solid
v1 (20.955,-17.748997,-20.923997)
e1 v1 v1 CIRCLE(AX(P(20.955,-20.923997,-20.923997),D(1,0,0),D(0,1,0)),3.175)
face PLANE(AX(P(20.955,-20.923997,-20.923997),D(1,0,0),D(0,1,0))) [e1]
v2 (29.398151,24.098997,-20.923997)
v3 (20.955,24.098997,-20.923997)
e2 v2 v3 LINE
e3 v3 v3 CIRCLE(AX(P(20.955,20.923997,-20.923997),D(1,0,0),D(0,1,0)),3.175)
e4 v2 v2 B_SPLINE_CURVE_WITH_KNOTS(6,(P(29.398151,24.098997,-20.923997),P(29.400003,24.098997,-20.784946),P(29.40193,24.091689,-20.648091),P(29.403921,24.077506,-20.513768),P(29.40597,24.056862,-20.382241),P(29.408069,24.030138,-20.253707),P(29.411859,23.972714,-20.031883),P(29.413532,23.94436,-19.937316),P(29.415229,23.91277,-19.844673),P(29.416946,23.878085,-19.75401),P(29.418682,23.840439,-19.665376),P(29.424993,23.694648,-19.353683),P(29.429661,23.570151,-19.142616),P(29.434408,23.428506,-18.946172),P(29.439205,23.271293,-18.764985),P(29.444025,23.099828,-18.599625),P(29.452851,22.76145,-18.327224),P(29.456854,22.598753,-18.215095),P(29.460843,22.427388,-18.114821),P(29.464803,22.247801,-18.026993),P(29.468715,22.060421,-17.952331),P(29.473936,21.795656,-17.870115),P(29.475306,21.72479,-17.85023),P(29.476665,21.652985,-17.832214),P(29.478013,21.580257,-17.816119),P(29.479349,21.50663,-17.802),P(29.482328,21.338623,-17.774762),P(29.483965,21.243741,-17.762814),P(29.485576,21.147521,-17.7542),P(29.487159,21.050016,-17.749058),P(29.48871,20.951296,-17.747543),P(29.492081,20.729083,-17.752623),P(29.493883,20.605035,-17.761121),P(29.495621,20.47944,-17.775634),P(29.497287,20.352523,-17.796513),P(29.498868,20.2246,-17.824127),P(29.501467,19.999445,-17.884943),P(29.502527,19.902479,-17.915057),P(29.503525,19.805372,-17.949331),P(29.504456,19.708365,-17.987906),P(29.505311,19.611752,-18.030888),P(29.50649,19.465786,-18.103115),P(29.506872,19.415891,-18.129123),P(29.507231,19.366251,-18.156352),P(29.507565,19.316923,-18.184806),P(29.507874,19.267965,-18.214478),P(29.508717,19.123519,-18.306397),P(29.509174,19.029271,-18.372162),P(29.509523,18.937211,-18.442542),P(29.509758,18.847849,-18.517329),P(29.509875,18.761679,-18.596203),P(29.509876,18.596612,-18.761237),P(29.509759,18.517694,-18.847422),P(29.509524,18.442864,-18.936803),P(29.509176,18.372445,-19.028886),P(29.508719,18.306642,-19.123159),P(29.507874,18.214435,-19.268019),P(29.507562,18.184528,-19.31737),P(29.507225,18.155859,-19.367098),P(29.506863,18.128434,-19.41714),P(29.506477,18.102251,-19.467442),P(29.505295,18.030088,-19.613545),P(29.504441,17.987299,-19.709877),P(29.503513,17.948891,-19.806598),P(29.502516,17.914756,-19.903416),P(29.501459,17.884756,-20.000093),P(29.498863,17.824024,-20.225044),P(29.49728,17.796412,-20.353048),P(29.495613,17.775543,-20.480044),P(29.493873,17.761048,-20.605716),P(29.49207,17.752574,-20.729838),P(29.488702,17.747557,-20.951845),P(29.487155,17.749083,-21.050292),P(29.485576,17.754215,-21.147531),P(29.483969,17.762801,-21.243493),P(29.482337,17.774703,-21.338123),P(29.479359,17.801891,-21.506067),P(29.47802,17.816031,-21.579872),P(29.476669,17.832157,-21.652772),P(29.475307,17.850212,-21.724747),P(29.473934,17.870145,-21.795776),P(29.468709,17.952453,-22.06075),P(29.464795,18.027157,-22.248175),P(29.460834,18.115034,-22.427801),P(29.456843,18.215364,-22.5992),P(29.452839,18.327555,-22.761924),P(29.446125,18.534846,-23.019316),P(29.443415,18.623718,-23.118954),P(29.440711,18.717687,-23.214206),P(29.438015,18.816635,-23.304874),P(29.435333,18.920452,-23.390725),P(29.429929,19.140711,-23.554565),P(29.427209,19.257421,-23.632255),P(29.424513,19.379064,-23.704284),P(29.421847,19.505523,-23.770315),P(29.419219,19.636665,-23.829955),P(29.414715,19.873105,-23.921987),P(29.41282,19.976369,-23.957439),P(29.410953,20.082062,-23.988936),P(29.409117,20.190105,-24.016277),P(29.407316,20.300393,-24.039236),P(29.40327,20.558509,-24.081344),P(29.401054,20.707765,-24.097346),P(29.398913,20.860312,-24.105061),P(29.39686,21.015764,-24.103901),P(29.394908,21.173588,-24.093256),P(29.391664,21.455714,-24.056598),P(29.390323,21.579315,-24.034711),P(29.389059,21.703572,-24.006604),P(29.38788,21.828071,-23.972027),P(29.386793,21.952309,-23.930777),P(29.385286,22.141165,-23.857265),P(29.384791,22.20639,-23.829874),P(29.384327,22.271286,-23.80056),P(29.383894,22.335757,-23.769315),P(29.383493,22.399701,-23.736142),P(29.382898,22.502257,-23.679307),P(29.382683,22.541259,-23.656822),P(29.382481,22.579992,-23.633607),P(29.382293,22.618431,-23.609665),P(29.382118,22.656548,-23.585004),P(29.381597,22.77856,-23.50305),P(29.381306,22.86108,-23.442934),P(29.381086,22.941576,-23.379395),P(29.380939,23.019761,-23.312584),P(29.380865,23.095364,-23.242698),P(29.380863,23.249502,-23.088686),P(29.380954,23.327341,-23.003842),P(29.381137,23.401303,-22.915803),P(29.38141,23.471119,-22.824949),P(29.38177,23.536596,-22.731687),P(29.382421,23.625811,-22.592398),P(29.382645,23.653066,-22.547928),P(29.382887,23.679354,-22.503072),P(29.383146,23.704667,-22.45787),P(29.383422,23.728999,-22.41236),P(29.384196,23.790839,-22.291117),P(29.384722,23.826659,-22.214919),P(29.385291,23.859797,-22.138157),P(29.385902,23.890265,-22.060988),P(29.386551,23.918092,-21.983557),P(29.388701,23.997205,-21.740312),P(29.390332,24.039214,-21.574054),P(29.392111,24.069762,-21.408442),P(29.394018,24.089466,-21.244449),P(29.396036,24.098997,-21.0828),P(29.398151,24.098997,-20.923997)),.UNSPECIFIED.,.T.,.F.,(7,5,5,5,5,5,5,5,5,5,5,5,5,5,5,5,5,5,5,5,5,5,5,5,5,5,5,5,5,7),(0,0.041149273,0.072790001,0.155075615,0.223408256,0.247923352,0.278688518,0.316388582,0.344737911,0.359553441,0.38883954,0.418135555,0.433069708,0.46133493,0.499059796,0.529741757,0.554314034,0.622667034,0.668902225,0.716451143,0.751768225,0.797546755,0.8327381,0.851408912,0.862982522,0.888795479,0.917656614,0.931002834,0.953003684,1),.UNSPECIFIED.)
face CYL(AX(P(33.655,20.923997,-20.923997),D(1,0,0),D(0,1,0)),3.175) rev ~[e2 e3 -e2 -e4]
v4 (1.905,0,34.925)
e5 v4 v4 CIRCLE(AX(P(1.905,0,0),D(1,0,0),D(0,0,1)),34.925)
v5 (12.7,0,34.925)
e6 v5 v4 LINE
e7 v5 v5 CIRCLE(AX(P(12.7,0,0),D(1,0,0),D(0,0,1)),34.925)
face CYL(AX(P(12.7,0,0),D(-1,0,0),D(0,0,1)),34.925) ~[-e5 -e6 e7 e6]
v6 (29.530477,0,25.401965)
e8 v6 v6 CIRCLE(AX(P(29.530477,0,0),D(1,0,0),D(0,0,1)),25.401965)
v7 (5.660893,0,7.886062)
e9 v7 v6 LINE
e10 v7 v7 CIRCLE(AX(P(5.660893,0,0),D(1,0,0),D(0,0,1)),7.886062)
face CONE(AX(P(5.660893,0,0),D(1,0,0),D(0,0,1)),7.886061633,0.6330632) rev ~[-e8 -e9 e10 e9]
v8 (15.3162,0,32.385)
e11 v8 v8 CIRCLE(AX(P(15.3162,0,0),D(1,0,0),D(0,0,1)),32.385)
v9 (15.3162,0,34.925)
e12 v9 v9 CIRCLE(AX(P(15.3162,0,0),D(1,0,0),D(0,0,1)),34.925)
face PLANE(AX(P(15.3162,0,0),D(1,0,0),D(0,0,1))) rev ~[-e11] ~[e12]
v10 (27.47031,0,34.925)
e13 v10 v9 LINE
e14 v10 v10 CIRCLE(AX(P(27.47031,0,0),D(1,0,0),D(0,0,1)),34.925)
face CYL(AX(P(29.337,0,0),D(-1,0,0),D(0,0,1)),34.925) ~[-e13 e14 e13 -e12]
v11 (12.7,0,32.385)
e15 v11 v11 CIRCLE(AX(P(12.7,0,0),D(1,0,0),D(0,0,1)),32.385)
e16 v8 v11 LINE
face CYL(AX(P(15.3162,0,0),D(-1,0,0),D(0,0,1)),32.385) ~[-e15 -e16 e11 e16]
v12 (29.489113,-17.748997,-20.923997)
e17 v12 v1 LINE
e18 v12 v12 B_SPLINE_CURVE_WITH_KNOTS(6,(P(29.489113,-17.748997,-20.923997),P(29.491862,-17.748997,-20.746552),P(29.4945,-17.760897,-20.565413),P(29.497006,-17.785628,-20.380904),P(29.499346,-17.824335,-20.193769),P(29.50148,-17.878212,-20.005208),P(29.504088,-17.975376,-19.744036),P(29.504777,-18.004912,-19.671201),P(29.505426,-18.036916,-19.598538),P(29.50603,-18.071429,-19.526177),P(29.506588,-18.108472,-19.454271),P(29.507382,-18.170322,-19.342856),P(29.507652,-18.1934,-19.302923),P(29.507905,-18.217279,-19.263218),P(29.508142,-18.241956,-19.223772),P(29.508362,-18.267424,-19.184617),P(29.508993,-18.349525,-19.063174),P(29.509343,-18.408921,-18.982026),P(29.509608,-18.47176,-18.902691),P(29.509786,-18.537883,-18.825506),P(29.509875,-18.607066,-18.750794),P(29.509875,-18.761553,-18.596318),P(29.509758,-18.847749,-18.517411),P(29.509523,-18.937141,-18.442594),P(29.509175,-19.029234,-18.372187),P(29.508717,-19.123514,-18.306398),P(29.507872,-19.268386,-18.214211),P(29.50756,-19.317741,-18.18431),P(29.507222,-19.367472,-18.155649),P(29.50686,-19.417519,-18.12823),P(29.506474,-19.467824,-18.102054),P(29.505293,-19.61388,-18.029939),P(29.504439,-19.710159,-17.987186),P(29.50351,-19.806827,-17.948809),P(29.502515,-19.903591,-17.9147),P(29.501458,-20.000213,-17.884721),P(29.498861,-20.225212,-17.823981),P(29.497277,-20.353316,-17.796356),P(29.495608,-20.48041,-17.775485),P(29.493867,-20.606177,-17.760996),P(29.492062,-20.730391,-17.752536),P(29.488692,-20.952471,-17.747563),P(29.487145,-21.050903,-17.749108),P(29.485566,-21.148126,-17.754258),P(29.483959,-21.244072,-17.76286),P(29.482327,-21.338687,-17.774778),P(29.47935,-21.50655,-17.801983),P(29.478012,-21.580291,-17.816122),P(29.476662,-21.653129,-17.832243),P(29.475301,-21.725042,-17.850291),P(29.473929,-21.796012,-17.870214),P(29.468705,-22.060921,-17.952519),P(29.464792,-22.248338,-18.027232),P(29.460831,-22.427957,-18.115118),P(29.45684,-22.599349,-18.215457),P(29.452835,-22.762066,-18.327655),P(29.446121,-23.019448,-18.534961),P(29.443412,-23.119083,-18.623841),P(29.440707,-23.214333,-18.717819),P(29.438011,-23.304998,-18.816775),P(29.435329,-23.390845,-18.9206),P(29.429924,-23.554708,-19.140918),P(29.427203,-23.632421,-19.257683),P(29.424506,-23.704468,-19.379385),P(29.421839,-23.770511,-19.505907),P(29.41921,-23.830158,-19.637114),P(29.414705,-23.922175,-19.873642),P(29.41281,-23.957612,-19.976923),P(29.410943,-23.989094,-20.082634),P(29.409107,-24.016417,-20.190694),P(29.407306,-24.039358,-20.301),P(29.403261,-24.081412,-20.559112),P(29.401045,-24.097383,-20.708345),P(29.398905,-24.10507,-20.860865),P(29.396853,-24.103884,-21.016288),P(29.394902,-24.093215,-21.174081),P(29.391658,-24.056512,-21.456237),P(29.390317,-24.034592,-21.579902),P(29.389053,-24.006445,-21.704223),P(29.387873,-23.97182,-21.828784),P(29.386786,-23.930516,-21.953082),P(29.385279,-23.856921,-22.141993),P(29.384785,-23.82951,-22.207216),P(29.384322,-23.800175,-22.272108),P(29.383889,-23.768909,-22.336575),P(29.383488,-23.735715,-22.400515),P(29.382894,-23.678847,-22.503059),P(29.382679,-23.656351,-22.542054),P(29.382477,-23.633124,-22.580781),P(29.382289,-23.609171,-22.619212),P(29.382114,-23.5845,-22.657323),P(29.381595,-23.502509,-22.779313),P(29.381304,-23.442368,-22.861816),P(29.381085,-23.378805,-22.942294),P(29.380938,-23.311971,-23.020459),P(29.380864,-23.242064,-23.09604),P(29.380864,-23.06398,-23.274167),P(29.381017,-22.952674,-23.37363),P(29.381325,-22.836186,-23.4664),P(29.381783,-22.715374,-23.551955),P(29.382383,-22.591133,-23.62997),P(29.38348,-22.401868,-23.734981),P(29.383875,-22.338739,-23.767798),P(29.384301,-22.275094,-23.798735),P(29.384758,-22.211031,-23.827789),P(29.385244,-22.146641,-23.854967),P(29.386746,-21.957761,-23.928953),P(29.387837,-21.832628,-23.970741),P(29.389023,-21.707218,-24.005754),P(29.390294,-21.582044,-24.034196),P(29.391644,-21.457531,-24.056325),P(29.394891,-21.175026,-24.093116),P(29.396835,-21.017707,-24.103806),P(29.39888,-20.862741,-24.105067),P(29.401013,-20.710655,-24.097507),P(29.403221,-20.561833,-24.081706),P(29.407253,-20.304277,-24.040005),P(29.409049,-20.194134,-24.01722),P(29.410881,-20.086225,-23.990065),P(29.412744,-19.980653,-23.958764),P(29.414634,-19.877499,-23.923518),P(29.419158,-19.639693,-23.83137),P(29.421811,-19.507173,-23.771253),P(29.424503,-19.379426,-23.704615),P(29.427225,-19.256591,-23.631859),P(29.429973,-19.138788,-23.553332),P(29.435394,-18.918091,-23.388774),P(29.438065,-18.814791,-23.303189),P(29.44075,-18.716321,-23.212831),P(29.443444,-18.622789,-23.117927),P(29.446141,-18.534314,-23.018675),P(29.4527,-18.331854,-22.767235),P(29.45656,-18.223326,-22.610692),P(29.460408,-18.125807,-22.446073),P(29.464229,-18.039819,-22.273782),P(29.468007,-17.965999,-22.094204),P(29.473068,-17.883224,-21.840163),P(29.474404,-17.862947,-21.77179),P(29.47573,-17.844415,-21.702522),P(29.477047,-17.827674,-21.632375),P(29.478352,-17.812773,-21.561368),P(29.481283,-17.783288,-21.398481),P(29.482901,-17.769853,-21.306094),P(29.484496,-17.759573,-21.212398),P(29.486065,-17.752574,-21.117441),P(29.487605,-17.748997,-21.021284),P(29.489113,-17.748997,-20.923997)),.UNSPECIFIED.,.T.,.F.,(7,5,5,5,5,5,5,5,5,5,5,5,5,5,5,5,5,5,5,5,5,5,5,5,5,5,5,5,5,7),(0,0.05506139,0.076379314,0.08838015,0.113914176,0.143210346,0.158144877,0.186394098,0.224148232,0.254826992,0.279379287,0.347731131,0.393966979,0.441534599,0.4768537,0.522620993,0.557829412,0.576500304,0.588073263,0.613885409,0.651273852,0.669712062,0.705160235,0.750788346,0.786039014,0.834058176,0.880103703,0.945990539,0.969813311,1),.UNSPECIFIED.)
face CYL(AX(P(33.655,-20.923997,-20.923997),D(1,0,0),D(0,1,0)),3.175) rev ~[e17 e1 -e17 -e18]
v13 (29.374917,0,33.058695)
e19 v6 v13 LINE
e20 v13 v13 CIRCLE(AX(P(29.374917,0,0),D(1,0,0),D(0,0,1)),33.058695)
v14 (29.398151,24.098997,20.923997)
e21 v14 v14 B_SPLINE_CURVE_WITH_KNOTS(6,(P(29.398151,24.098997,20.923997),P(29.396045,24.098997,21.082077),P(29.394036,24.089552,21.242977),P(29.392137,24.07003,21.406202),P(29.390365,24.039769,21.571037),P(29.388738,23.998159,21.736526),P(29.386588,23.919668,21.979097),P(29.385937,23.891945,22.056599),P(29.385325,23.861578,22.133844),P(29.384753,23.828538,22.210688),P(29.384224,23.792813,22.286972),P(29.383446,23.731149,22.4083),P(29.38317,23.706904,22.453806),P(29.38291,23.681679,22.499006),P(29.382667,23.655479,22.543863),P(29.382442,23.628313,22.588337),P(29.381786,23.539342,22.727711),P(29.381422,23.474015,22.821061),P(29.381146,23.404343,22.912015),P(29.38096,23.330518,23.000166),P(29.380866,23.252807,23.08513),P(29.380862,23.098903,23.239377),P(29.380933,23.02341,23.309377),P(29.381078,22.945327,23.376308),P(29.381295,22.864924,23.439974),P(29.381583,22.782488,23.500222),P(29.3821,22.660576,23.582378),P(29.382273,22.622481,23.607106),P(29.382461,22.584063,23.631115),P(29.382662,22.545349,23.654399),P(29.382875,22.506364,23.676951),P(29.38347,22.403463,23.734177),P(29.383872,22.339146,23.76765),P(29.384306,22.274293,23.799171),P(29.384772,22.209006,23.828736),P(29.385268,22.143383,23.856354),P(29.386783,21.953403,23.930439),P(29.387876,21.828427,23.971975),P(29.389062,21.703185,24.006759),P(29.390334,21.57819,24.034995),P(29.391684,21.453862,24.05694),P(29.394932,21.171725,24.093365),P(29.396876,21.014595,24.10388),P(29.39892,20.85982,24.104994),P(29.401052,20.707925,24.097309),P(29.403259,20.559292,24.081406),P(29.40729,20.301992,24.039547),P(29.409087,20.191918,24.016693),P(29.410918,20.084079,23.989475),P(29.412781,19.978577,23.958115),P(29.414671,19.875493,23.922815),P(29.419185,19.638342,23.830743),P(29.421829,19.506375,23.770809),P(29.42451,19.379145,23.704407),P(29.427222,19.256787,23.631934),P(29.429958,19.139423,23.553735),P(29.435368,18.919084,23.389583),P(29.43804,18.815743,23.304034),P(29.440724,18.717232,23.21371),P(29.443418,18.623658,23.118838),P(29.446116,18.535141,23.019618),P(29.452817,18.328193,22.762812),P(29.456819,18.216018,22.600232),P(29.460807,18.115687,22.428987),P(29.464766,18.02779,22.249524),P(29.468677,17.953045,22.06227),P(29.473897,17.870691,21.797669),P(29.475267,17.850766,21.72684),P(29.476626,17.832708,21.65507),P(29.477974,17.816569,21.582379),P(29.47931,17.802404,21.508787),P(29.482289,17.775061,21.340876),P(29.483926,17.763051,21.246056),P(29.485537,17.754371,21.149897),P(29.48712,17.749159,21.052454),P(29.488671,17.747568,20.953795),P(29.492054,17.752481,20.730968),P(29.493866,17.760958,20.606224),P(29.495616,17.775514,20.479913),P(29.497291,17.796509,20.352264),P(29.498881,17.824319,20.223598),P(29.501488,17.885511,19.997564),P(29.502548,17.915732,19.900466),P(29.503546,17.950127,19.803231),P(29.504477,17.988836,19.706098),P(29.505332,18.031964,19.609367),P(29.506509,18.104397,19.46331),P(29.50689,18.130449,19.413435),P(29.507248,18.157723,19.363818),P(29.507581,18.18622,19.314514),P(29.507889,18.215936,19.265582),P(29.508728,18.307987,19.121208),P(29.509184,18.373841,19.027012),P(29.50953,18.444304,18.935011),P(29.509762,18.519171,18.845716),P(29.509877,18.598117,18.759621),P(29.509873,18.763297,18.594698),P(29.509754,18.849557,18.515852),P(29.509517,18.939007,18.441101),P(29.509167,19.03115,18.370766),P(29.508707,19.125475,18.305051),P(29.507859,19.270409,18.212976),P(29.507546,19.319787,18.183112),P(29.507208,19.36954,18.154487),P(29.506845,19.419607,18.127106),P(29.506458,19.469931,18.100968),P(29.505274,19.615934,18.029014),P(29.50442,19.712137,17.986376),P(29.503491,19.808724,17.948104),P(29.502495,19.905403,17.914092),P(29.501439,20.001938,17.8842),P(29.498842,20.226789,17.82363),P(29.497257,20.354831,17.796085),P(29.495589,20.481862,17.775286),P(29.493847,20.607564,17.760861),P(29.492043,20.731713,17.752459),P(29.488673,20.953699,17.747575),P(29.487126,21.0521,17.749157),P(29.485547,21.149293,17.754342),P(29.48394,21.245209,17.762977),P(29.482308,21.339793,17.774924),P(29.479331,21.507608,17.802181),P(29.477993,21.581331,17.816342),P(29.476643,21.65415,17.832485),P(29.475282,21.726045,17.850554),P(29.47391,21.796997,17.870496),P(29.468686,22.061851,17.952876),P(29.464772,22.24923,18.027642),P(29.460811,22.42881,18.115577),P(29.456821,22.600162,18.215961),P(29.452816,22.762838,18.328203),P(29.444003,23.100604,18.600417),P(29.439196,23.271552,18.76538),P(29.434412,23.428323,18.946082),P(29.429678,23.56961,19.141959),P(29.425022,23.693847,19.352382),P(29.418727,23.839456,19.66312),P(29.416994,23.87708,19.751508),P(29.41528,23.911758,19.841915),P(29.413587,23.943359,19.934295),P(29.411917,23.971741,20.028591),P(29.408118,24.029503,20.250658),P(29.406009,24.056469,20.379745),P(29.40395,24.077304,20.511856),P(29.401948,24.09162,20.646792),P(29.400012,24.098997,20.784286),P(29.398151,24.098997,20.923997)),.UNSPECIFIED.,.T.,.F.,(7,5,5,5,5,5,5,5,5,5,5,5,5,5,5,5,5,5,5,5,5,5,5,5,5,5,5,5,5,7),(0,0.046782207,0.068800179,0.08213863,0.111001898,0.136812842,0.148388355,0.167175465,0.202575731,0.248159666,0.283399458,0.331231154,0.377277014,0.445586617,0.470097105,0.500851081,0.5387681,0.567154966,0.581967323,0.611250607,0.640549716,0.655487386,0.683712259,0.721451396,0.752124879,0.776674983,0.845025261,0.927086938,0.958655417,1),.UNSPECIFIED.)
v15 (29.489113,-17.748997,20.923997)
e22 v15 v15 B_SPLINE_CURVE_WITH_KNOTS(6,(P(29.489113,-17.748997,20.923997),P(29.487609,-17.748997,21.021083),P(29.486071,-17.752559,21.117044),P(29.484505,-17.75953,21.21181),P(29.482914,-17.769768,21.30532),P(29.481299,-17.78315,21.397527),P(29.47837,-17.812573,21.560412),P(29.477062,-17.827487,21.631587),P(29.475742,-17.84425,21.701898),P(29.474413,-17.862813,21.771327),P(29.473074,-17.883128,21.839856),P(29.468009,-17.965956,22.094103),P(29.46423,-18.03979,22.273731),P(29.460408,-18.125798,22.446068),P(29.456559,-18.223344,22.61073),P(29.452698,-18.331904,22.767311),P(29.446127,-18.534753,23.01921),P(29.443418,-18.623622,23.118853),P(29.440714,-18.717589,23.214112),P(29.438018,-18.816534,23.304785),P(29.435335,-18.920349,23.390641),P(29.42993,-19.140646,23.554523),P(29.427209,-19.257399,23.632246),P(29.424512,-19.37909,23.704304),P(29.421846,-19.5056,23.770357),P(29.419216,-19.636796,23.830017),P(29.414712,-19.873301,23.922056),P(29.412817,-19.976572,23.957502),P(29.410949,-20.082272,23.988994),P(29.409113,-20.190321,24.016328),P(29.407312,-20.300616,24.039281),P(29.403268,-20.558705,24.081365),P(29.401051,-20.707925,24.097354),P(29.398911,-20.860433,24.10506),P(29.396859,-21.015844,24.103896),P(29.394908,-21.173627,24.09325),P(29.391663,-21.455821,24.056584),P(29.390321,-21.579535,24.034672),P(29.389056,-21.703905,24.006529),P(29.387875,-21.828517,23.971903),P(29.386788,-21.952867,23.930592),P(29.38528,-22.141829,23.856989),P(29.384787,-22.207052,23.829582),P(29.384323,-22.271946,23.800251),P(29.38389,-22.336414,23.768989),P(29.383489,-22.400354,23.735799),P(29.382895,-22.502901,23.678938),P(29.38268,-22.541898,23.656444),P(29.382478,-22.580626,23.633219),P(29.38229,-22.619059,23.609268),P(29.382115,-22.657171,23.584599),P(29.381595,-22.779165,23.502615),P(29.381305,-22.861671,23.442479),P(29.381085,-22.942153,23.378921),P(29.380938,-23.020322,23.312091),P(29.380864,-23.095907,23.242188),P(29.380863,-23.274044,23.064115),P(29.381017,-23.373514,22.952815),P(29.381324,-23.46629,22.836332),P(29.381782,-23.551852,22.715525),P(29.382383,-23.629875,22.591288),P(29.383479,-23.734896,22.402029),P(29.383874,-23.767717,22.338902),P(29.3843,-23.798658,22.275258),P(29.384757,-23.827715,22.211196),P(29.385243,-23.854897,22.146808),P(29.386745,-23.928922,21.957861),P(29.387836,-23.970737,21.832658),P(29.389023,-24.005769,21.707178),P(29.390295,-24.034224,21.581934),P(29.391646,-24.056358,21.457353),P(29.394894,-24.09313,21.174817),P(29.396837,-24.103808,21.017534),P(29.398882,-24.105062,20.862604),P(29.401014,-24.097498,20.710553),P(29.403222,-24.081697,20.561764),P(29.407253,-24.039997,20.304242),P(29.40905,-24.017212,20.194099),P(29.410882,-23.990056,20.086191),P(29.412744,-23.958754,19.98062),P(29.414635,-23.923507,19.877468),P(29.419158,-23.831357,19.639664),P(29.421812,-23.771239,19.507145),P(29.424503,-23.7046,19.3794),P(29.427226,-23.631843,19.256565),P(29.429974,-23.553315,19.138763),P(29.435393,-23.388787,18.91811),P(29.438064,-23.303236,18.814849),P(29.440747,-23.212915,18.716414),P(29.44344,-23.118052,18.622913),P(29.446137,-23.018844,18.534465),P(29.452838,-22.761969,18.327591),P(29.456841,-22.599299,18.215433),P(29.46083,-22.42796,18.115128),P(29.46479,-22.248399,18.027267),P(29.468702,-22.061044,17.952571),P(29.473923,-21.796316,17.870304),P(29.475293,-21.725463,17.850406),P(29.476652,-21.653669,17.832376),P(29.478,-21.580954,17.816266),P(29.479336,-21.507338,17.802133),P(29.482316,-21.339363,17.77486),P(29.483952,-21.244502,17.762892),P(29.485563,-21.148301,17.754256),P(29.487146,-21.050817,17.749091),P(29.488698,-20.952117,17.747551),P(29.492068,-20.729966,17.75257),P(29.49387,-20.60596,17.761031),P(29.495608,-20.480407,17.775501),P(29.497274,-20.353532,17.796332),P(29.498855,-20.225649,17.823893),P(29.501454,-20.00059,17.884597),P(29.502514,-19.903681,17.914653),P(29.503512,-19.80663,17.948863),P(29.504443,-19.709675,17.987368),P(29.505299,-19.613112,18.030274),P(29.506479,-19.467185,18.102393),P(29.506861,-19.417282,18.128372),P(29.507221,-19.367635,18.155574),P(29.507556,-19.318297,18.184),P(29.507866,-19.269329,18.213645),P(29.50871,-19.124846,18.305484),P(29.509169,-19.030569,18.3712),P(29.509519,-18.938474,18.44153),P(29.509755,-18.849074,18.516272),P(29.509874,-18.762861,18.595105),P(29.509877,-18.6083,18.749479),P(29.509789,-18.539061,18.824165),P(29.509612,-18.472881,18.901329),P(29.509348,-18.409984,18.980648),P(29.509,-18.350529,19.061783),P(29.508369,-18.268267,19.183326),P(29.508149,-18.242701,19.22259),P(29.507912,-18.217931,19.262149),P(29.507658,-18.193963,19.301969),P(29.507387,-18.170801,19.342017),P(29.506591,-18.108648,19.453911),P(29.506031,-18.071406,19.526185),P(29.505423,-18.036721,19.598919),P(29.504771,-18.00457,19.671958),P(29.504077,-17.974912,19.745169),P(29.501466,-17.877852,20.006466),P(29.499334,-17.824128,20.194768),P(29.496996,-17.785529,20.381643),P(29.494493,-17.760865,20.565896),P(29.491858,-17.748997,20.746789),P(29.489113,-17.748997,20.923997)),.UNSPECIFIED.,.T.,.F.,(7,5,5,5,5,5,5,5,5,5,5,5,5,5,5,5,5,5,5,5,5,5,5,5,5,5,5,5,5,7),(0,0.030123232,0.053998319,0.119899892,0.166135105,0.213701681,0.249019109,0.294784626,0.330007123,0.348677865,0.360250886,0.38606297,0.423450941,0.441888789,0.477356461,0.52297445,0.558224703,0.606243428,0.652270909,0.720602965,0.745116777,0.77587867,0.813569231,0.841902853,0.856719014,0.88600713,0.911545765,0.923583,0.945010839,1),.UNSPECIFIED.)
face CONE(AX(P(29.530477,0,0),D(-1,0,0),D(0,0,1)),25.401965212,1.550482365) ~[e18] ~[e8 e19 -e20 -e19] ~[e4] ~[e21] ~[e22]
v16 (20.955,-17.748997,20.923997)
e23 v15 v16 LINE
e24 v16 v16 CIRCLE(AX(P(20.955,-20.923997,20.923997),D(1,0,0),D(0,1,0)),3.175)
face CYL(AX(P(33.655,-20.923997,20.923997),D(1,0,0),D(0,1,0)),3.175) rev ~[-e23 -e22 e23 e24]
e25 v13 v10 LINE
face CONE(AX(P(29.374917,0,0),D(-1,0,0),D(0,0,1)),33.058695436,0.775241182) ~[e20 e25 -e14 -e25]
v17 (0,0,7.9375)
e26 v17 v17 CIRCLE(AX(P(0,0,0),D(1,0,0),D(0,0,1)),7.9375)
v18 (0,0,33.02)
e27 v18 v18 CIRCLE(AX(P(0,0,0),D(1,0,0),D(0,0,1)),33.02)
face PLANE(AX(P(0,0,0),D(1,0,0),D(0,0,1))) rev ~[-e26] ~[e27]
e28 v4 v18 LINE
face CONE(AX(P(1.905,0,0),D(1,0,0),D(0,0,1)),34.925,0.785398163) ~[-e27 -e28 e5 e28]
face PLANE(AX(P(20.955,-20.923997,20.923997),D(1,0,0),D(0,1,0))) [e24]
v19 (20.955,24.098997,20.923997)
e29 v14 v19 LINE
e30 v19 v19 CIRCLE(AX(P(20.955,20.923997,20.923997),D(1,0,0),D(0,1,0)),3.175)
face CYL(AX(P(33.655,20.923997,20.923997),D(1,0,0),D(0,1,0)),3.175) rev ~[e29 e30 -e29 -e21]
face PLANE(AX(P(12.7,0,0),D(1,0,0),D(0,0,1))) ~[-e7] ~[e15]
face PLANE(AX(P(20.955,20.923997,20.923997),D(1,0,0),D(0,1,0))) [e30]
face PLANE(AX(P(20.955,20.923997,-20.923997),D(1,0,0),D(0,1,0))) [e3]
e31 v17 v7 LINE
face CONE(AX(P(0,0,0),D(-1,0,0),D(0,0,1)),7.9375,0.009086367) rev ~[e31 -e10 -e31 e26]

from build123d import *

# Parameters (mm, degrees)
F4_R     = 3.175
F5_DEPTH = 12.7


# Not quite as in the source:
# - a fillet or chamfer that OpenCascade refuses, or shapes differently, is made with other operations: its cross-section is extruded or revolved along the edge and cut away or added


with BuildPart() as f1:
    # F0 (on Front) → F1 (revolve)
    with BuildSketch(Plane.XZ):
        Polygon((0, 7.9375), (5.6608929044, 7.8860616331), (29.5304771808, 25.4019652116), (29.337, 34.925), (15.3162, 34.925), (15.3162, 32.385), (12.7, 32.385), (12.7, 34.925), (0, 34.925), align=None)
    revolve(axis=Axis((10.2213714272, 0, 0), (1, 0, 0)))

    # F2: chamfer of 1.905 on 2 edges, made by hand

    # F2_s1 → F2_t2 (revolve, cut)
    with BuildSketch(Plane.XZ):
        Polygon((1.905, 34.925), (0, 33.02), (0, 34.925), align=None)
    revolve(axis=Axis((0, 0, 0), (1, 0, 0)), mode=Mode.SUBTRACT)

    # F2_s3 → F2_t4 (revolve, cut)
    with BuildSketch(Plane.XZ):
        Polygon((29.3749172557, 33.0586954362), (27.4703102981, 34.925), (29.337, 34.925), align=None)
    revolve(axis=Axis((29.337, 0, 0), (1, 0, 0)), mode=Mode.SUBTRACT)

    # F4 (on offset) → F5 (cut)
    with BuildSketch(Plane.YZ.offset(33.655)):
        with Locations((20.9239967621, 20.9239967621)):
            Circle(F4_R)
        with Locations((20.9239967621, -20.9239967621)):
            Circle(F4_R)
        with Locations((-20.9239967621, -20.9239967621)):
            Circle(F4_R)
        with Locations((-20.9239967621, 20.9239967621)):
            Circle(F4_R)
    extrude(amount=-F5_DEPTH, mode=Mode.SUBTRACT)


solid = f1.part
